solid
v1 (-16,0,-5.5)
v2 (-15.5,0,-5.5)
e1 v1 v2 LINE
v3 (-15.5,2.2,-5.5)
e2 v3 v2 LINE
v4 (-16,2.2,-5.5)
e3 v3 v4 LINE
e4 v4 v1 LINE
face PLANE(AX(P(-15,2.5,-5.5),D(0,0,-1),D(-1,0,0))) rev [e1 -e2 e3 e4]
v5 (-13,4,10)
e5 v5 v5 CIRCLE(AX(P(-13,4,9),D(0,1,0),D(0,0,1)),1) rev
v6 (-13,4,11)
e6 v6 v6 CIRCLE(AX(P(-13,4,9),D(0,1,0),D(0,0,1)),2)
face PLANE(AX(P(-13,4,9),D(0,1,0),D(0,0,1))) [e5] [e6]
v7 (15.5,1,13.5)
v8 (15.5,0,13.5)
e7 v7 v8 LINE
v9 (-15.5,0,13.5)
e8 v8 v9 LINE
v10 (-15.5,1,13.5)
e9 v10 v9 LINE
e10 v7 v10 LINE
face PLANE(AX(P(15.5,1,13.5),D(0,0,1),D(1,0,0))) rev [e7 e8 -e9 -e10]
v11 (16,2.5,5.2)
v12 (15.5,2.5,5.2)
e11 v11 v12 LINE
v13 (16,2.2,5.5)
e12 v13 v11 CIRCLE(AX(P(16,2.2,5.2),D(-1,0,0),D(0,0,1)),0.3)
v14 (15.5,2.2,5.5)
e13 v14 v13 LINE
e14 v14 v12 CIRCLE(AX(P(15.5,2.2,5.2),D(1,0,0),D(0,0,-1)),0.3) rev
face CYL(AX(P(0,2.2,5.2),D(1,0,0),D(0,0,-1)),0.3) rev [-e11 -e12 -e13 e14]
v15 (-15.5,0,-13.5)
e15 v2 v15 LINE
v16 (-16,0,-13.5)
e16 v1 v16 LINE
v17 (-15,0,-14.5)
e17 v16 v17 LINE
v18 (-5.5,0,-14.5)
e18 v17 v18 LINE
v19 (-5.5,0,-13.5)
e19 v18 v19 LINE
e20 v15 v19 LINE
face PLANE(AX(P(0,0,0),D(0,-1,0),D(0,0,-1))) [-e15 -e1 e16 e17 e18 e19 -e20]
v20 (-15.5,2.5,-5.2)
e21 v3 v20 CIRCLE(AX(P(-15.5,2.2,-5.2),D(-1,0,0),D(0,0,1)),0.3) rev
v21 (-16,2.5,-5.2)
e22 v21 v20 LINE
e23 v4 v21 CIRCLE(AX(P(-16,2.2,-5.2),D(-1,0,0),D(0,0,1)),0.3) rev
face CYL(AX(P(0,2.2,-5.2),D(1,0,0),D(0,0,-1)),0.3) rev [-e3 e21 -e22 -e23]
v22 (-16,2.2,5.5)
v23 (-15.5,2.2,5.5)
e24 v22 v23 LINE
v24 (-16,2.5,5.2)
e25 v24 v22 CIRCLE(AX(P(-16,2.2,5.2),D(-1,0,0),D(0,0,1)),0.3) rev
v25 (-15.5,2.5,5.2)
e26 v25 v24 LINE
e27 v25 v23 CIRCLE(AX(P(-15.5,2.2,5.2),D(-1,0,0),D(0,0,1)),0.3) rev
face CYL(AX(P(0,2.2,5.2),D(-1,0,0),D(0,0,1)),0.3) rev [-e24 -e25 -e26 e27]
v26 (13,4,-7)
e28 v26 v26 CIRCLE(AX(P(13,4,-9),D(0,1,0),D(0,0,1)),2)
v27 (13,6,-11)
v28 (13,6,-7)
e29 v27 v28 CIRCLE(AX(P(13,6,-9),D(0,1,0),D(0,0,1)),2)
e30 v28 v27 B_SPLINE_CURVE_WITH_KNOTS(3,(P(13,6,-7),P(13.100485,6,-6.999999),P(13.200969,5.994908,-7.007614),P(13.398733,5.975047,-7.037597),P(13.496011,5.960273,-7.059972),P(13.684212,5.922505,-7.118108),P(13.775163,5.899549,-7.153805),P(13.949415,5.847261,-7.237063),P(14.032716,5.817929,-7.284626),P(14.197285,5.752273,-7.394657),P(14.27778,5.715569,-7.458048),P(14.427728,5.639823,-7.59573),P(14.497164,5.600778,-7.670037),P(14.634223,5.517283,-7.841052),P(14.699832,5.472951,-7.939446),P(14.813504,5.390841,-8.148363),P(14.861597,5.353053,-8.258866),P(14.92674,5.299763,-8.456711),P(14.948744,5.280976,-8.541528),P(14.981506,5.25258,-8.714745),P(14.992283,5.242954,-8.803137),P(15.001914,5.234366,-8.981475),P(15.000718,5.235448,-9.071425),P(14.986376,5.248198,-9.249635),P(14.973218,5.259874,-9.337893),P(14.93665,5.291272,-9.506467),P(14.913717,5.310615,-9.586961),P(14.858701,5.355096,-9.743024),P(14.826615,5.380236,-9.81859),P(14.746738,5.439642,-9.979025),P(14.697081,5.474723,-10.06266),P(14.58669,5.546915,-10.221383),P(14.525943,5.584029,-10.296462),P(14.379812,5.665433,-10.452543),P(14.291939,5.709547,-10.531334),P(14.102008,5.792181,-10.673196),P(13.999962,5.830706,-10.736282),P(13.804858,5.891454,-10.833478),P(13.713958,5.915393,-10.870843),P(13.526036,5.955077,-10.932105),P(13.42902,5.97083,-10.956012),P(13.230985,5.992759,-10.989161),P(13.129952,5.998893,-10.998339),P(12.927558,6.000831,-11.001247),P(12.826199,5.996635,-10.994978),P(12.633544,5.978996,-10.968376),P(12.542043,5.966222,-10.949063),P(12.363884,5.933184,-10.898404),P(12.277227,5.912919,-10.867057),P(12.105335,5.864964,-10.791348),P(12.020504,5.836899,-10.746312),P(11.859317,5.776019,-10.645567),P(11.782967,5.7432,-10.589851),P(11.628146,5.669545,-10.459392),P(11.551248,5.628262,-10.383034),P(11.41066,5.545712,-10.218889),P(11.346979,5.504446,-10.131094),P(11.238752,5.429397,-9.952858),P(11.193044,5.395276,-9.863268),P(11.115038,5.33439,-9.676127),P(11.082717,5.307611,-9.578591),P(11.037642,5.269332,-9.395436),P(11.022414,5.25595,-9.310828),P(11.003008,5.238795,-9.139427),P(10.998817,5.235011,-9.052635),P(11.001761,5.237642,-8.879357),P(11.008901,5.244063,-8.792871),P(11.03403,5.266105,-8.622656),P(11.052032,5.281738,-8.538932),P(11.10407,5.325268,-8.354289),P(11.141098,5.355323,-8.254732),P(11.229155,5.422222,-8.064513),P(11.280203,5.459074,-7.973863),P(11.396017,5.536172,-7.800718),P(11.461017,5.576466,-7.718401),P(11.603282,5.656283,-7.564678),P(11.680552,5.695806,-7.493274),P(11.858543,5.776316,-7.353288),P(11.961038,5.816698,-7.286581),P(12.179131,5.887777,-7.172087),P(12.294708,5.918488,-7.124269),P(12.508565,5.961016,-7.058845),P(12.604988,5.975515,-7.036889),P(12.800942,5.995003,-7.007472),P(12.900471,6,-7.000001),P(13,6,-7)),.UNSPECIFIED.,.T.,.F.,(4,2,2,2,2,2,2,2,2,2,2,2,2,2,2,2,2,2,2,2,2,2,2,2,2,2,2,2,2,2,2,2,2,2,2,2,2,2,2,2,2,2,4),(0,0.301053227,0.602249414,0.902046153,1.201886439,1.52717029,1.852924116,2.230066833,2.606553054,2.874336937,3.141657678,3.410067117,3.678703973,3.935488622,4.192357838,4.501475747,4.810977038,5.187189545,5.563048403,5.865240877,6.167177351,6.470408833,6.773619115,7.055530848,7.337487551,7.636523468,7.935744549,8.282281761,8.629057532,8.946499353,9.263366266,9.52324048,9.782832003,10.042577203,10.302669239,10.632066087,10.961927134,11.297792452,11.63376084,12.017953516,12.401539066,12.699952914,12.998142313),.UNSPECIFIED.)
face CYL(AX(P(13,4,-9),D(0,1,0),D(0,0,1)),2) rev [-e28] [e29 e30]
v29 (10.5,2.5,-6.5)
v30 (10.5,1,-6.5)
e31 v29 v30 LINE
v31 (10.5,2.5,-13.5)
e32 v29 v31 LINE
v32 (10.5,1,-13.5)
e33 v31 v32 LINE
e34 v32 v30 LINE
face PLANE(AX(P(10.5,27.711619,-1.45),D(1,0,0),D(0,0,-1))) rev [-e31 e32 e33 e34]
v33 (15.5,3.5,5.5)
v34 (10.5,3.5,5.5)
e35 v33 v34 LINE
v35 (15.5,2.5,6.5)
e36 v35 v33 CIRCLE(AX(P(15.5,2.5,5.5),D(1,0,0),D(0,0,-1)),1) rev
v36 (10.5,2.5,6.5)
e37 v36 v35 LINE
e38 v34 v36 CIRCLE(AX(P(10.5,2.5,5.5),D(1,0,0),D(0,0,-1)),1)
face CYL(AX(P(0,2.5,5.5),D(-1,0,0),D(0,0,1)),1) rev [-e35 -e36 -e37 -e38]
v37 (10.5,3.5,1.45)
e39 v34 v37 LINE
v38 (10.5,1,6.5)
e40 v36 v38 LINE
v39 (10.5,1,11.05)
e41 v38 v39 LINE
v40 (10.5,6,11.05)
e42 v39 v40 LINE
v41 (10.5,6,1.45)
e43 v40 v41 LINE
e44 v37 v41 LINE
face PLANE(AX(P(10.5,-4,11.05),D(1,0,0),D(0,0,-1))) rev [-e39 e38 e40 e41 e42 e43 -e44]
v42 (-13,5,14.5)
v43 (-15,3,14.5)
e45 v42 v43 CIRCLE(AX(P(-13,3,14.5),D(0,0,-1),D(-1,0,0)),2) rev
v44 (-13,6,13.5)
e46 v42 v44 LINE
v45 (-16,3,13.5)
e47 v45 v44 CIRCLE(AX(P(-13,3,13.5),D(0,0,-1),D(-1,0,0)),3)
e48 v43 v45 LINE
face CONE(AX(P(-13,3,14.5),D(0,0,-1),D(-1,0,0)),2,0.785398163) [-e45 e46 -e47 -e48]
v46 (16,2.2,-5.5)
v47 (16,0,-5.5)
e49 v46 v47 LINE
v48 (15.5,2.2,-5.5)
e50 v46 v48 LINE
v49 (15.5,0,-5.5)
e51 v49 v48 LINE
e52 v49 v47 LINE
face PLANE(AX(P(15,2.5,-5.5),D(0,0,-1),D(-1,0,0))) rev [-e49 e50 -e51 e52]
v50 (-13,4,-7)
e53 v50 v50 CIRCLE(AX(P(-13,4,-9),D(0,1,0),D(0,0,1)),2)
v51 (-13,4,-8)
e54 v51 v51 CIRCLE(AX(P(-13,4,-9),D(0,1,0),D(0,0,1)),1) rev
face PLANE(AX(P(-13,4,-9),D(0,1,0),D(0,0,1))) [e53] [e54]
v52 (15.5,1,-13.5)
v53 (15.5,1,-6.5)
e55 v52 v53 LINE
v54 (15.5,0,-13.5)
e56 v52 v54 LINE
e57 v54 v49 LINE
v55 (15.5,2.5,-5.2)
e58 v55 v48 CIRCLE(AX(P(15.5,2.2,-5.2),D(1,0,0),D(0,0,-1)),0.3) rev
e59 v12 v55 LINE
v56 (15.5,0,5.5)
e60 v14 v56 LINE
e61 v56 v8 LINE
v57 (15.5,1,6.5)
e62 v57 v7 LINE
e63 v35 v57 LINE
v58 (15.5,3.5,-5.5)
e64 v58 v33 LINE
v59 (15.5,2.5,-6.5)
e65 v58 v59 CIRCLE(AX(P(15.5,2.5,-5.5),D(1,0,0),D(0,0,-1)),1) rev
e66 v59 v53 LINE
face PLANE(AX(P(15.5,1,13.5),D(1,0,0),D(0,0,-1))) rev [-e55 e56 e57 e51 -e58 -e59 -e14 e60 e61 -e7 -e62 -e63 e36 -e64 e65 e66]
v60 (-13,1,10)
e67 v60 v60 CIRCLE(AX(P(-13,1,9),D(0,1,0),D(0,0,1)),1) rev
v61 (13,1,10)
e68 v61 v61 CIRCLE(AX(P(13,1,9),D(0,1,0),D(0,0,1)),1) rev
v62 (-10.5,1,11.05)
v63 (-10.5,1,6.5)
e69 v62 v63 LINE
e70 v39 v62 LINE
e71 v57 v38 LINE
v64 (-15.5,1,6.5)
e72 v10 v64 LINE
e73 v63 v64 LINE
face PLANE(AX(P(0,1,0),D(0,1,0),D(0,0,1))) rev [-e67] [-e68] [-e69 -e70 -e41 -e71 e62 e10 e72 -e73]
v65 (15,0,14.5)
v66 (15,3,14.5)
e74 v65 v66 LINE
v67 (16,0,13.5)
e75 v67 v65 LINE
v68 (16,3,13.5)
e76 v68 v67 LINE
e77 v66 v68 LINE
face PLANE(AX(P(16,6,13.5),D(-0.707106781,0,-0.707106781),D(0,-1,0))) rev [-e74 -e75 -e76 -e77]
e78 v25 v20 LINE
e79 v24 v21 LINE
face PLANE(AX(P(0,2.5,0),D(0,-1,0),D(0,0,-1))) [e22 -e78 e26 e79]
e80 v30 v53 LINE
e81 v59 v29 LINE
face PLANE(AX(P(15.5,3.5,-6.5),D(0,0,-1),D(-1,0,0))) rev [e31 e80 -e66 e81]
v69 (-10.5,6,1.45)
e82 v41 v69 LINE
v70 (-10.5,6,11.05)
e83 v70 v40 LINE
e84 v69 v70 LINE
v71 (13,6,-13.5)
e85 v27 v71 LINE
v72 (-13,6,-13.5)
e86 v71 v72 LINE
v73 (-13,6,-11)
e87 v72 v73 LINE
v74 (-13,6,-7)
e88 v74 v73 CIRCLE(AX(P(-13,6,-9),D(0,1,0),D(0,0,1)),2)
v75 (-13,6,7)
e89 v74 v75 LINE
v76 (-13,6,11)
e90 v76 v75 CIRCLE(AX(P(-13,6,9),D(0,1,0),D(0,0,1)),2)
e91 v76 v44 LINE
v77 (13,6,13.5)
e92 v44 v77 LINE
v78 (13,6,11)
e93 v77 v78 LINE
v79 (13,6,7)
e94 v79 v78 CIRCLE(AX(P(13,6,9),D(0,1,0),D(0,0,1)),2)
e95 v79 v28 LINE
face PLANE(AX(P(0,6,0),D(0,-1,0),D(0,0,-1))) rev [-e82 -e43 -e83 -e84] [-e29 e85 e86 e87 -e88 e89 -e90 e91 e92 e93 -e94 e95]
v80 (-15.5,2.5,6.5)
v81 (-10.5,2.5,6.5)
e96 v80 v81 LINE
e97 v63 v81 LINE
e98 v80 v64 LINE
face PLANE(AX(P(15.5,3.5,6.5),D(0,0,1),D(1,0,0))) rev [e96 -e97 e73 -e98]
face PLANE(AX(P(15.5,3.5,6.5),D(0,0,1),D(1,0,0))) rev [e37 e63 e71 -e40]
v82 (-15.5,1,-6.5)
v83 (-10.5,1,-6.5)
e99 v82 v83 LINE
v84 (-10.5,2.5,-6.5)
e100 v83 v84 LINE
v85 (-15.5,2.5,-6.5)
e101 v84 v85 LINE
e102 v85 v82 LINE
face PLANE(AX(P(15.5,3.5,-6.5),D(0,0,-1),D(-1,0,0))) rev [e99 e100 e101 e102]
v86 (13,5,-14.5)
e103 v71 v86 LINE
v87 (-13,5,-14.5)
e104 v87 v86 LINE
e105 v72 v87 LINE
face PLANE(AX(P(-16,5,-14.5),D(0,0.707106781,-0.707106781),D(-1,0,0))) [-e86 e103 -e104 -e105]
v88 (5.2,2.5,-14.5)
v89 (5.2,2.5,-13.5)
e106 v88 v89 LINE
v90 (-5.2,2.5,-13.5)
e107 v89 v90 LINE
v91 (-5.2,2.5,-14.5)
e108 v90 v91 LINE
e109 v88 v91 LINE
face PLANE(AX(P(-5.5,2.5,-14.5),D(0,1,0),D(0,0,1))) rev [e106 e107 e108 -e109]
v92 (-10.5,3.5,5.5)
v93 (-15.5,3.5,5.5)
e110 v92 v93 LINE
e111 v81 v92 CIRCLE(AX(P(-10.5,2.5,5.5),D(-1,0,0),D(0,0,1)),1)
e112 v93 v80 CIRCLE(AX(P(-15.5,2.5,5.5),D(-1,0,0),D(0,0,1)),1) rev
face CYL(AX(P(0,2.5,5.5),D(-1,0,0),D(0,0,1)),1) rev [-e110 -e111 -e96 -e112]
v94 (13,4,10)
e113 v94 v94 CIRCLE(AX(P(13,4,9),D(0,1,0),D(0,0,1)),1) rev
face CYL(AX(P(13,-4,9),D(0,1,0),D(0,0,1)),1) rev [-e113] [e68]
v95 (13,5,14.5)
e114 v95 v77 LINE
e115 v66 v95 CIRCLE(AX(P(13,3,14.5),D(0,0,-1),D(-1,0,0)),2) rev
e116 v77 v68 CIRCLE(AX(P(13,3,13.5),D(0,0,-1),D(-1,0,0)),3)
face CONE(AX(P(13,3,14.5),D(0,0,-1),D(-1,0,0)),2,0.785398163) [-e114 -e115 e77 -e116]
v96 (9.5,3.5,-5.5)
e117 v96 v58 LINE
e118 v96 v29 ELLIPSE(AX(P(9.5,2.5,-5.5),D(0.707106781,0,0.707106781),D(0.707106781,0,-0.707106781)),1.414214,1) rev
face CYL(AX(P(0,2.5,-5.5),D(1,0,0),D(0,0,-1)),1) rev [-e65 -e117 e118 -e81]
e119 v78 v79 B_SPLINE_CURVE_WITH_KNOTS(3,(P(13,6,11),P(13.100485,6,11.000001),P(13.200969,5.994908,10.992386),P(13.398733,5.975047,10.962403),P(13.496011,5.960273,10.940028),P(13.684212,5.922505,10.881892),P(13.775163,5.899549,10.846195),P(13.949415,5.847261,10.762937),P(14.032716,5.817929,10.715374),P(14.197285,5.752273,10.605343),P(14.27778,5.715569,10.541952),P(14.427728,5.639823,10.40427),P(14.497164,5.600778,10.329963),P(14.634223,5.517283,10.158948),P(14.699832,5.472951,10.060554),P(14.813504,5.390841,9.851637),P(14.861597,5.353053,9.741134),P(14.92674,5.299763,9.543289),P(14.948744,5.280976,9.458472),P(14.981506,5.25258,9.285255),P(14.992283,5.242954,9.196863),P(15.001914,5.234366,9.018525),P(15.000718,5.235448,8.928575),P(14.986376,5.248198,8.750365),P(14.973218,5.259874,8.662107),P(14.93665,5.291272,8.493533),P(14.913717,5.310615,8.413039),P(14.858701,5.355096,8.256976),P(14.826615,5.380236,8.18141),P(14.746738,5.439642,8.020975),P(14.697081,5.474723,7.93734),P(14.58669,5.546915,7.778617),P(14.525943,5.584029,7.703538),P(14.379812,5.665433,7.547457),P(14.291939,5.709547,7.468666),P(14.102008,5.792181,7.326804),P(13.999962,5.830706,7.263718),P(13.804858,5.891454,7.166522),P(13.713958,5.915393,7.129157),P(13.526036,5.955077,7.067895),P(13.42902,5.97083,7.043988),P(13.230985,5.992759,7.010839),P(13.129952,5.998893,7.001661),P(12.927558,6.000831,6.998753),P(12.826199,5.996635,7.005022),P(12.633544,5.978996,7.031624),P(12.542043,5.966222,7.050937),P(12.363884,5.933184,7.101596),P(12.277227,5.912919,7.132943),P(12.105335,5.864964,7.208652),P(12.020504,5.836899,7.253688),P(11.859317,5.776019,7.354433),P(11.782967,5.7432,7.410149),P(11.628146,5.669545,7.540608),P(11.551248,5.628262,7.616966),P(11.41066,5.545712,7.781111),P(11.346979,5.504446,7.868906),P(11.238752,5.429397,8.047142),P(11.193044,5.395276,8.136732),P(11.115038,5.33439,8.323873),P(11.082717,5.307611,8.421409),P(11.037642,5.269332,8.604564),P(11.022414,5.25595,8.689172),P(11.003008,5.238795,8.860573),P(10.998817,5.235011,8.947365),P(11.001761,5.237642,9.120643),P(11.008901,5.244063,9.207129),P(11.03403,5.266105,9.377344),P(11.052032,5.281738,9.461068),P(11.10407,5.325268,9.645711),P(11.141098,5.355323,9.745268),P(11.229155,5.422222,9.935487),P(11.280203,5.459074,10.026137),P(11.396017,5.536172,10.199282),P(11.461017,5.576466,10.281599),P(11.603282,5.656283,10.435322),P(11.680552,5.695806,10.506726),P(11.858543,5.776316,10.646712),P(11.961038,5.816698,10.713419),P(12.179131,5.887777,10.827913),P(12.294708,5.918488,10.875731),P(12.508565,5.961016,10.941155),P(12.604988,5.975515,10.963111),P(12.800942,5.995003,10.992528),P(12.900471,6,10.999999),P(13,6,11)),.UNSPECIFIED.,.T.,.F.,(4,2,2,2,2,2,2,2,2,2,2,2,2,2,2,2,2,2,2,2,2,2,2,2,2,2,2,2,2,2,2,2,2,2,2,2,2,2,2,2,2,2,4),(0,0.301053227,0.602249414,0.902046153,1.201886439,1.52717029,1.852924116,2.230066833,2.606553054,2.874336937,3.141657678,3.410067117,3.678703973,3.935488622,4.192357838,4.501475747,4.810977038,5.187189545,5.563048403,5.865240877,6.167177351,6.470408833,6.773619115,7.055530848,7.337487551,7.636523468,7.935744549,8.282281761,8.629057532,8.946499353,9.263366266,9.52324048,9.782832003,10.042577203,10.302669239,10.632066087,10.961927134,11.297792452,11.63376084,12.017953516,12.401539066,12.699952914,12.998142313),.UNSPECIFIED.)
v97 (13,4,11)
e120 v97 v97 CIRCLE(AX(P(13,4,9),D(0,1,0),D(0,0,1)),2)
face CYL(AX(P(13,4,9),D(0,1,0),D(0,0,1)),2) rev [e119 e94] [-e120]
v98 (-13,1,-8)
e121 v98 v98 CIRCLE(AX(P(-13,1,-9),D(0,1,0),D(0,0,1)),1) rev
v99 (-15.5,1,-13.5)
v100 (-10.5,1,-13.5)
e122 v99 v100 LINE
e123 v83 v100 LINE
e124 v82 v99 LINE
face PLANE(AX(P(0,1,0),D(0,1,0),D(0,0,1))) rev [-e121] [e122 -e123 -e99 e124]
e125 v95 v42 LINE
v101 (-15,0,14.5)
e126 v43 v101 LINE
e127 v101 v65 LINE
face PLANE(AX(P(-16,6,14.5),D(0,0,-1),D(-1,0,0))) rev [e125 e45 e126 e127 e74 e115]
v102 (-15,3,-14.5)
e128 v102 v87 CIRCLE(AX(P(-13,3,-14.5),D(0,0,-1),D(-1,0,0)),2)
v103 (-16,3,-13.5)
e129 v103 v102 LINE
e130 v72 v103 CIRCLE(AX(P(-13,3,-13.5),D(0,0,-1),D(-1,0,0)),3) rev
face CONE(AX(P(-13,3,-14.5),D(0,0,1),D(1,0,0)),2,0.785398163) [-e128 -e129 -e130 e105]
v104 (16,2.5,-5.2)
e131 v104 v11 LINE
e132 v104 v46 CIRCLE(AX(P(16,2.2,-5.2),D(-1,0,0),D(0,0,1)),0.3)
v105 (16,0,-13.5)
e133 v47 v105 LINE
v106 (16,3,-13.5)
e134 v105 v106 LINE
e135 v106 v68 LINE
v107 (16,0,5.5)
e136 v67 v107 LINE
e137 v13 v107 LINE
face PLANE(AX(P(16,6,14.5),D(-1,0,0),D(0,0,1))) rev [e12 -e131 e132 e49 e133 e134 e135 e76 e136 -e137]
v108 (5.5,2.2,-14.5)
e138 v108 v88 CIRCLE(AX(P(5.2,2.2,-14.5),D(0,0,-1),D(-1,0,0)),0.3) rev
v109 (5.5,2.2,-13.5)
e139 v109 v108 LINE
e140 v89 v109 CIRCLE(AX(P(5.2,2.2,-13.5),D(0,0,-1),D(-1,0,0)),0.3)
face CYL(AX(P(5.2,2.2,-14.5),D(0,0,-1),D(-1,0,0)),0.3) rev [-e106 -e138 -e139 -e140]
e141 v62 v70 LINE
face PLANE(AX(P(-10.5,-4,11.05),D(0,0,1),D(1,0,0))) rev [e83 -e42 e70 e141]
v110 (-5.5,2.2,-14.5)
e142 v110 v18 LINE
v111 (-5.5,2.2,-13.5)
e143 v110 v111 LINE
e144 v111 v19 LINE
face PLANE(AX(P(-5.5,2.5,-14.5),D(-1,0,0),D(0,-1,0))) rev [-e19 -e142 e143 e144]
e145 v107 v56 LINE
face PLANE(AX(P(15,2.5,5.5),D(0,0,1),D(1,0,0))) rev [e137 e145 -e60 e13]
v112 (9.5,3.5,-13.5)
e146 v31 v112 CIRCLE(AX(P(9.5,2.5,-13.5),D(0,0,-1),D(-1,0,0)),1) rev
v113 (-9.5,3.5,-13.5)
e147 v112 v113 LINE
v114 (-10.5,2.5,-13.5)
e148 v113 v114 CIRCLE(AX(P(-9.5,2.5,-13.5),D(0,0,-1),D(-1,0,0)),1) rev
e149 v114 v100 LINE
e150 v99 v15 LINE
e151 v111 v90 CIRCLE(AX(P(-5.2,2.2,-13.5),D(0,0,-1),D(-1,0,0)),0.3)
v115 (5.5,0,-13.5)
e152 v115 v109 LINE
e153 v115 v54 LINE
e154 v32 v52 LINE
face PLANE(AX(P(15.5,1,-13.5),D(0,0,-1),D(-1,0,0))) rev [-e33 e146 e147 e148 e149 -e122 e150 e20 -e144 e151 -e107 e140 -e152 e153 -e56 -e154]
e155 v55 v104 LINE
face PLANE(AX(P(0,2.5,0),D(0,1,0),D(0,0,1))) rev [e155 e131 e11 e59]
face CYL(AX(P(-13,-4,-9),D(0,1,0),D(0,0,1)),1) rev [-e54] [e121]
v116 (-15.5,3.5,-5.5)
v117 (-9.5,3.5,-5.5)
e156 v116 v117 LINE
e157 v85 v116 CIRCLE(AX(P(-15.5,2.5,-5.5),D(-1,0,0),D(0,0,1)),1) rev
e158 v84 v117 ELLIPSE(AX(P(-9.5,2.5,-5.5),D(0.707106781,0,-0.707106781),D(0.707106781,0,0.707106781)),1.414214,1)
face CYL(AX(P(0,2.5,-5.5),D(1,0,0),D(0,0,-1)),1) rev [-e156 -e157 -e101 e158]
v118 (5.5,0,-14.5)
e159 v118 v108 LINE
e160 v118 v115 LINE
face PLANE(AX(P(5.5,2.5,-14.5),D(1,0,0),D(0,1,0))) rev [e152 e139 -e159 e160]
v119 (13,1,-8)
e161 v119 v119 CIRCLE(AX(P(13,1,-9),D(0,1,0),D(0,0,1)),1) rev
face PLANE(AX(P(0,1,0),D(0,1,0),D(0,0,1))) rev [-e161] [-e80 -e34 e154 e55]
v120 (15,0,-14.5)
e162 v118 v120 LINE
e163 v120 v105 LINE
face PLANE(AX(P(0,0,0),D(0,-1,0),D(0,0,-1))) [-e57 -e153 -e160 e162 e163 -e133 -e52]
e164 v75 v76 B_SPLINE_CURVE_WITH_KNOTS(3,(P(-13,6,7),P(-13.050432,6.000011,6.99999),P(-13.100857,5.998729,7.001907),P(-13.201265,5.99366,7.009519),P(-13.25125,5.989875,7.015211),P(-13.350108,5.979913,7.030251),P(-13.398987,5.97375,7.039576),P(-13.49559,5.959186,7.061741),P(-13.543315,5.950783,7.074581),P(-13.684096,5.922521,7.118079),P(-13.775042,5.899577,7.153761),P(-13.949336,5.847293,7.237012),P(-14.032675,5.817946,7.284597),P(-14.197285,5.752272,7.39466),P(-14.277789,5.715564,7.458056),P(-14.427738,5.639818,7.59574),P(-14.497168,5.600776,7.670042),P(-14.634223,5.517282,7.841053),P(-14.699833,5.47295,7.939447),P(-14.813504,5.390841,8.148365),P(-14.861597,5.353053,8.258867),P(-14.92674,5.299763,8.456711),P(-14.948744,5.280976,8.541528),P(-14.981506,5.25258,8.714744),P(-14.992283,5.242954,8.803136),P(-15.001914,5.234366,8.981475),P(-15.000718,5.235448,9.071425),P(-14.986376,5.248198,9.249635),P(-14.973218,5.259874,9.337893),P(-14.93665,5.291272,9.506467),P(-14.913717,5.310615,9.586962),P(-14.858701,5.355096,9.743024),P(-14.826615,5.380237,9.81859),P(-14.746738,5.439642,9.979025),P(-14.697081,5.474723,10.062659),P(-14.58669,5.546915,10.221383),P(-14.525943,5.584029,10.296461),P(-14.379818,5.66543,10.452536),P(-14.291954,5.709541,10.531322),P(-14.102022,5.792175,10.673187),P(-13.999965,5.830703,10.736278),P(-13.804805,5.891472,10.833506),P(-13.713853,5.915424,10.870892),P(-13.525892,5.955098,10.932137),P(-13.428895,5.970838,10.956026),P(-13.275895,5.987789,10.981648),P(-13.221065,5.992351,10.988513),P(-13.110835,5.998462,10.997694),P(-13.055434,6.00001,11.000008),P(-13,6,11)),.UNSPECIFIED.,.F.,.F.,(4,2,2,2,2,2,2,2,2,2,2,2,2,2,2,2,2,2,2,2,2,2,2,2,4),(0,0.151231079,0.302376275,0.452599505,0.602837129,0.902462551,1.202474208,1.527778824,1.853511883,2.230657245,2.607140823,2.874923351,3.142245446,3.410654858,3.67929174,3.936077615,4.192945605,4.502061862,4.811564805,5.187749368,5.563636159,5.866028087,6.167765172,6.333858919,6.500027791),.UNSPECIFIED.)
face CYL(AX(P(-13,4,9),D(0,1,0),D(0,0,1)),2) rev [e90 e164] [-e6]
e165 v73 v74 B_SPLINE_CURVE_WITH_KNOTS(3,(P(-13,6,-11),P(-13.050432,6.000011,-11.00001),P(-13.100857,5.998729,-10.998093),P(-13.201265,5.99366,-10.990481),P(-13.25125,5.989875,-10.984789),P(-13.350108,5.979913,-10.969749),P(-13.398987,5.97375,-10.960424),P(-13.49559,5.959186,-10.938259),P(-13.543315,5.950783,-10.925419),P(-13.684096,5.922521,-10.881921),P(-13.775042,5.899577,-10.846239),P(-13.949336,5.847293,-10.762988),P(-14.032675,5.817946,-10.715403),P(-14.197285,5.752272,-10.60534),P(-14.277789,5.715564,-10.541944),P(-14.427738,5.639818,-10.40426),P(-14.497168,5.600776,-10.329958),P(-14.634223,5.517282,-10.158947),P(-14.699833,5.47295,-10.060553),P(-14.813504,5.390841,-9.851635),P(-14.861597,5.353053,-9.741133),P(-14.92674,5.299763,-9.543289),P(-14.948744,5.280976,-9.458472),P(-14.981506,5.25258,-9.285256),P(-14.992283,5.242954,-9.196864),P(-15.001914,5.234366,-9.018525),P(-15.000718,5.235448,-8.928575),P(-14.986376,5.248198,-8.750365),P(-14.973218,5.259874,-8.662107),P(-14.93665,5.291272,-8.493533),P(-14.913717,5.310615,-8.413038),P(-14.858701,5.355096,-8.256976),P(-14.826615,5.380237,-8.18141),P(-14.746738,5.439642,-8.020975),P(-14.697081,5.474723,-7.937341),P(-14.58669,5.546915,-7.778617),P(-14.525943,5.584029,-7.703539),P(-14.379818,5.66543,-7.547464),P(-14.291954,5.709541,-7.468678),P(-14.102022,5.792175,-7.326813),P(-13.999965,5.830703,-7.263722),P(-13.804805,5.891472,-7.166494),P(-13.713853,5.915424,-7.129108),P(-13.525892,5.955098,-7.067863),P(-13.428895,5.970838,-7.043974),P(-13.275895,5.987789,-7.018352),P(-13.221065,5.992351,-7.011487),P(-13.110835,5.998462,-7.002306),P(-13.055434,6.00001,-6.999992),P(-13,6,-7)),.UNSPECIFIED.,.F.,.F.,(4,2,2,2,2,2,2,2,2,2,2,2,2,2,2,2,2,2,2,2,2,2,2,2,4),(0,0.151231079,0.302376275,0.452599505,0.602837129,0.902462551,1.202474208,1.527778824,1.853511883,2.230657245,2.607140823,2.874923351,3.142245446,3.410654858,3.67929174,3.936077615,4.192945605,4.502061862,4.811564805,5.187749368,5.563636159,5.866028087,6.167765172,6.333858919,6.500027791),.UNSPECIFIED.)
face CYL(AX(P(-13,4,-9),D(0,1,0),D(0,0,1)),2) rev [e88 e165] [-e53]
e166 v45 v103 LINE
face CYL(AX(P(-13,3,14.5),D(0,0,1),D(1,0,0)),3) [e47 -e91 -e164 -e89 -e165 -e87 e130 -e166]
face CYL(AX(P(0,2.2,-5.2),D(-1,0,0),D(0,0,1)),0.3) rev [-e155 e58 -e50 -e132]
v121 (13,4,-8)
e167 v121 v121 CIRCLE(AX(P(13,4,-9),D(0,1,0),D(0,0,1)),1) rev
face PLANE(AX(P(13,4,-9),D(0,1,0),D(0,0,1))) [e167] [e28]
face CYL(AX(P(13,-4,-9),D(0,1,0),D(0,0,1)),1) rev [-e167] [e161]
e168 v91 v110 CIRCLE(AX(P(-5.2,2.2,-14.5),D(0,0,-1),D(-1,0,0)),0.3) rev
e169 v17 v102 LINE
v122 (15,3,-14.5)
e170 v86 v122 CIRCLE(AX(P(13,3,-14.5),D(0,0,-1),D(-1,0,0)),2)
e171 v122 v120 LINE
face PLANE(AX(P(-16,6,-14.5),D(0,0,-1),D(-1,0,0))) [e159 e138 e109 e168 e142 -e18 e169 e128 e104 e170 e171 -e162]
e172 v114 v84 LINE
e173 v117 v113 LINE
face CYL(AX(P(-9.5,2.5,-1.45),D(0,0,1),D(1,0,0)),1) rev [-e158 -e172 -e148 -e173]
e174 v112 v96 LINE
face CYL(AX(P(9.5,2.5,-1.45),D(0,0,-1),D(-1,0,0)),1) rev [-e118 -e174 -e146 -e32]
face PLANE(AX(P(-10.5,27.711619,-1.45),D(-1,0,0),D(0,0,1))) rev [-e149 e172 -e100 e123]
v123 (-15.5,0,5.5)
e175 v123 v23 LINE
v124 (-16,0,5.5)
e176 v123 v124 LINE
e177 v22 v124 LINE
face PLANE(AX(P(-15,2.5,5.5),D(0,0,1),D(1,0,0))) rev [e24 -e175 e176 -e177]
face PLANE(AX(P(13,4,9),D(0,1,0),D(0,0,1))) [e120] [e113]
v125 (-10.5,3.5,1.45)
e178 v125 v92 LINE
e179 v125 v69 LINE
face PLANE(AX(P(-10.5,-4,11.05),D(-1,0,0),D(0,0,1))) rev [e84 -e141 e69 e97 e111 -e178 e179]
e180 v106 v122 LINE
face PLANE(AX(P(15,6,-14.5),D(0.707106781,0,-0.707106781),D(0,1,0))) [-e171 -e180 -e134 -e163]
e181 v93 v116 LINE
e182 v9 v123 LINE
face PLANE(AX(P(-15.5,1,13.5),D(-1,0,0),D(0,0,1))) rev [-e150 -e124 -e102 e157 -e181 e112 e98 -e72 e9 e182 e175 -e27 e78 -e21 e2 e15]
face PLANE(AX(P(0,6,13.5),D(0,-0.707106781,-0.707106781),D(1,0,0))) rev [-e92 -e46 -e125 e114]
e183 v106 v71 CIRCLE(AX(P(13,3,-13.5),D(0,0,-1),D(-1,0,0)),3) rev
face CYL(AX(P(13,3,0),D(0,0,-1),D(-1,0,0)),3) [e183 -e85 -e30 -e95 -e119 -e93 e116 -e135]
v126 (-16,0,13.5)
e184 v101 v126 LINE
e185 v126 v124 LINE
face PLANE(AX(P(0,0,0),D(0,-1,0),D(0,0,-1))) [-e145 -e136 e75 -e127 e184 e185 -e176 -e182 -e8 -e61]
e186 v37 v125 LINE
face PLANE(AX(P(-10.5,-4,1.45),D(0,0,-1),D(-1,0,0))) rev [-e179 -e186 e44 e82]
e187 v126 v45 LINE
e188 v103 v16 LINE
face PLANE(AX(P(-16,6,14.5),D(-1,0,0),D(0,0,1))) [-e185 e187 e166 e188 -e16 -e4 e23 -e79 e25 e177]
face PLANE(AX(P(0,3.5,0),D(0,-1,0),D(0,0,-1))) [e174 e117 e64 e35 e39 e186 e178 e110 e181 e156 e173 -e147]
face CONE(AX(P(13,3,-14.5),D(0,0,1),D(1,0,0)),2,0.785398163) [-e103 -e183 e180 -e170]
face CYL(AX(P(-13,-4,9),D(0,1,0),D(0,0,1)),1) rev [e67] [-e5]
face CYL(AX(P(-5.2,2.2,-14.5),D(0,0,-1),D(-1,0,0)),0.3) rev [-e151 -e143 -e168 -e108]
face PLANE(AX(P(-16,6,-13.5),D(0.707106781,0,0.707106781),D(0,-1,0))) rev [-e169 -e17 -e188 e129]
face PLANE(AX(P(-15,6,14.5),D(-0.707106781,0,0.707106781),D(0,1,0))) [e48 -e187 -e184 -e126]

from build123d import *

# Parameters (mm, degrees)
SKETCH1_W           = 32
SKETCH1_H           = 29
BOSS_EXTRUDE1_DEPTH = 6
SKETCH2_R           = 1
CUT_EXTRUDE1_DEPTH  = 10
SKETCH3_W           = 21
SKETCH3_H           = 9.6
CUT_EXTRUDE2_DEPTH  = 10
SKETCH4_W           = 31
SKETCH4_H           = 27
CUT_EXTRUDE3_DEPTH  = 1
FILLET2_R           = 3
SKETCH5_R           = 2
CUT_EXTRUDE4_DEPTH  = 2
CHAMFER2_SIZE       = 1
SKETCH6_W           = 1
SKETCH6_H           = 11
CUT_EXTRUDE5_DEPTH  = 2.5
FILLET3_R           = 0.3
SKETCH7_W           = 31
SKETCH7_H           = 13
CUT_EXTRUDE6_DEPTH  = 2.5
FILLET4_R           = 1
SKETCH_1_W          = 21
SKETCH_1_H          = 12.05
CUT_EXTRUDE_1_DEPTH = 2.5
FILLET_1_R          = 1
SKETCH_2_W          = 11
SKETCH_2_H          = 2.5
CUT_EXTRUDE_2_DEPTH = 33.802439001
FILLET_2_R          = 0.3


with BuildPart() as part:
    # Sketch1 → Boss-Extrude1 (new body)
    with BuildSketch(Plane(origin=(0, 0, 0), x_dir=(1, 0, 0), z_dir=(0, 1, 0))):
        Rectangle(SKETCH1_W, SKETCH1_H)
    extrude(amount=BOSS_EXTRUDE1_DEPTH)

    # Sketch2 → Cut-Extrude1 (cut)
    with BuildSketch(Plane(origin=(0, 6, 0), x_dir=(1, 0, 0), z_dir=(0, 1, 0))):
        with Locations(Location((-13, 9, 0), (0, 0, 270))):
            Circle(SKETCH2_R)
        with Locations(Location((13, 9, 0), (0, 0, 270))):
            Circle(SKETCH2_R)
        with Locations(Location((13, -9, 0), (0, 0, 270))):
            Circle(SKETCH2_R)
        with Locations(Location((-13, -9, 0), (0, 0, 270))):
            Circle(SKETCH2_R)
    extrude(amount=-CUT_EXTRUDE1_DEPTH, mode=Mode.SUBTRACT)

    # Sketch3 → Cut-Extrude2 (cut)
    with BuildSketch(Plane(origin=(0, 6, 0), x_dir=(1, 0, 0), z_dir=(0, 1, 0))):
        with Locations((0, -6.25)):
            Rectangle(SKETCH3_W, SKETCH3_H)
    extrude(amount=-CUT_EXTRUDE2_DEPTH, mode=Mode.SUBTRACT)

    # Sketch4 → Cut-Extrude3 (cut)
    with BuildSketch(Plane.XZ):
        Rectangle(SKETCH4_W, SKETCH4_H)
    extrude(amount=-CUT_EXTRUDE3_DEPTH, mode=Mode.SUBTRACT)

    # Fillet2
    # the kernel refuses this fillet: 3 mm, written as the material it takes off along each edge
    with BuildSketch(Plane(origin=(16, 6, 22), x_dir=(0, -1, 0), z_dir=(0, 0, -1)), Plane(origin=(-16, 6, -22), x_dir=(0, -1, 0), z_dir=(0, 0, 1))) as fillet2_piece_1:
        with BuildLine():
            CenterArc((FILLET2_R, FILLET2_R), FILLET2_R, 180, 90)
            Line((0, FILLET2_R), (0, 0))
            Line((0, 0), (FILLET2_R, 0))
        make_face()
    extrude(amount=44, mode=Mode.SUBTRACT)

    # Sketch5 → Cut-Extrude4 (cut)
    with BuildSketch(Plane(origin=(0, 6, 0), x_dir=(1, 0, 0), z_dir=(0, 1, 0))):
        with Locations(Location((-13, 9, 0), (0, 0, 270))):
            Circle(SKETCH5_R)
        with Locations(Location((13, 9, 0), (0, 0, 270))):
            Circle(SKETCH5_R)
        with Locations(Location((13, -9, 0), (0, 0, 270))):
            Circle(SKETCH5_R)
        with Locations(Location((-13, -9, 0), (0, 0, 270))):
            Circle(SKETCH5_R)
    extrude(amount=-CUT_EXTRUDE4_DEPTH, mode=Mode.SUBTRACT)

    # Chamfer2
    chamfer2_edges = [part.edges().sort_by_distance(p)[0] for p in [
        (16, 1.5, 14.5),
        (15.121320344, 5.121320344, 14.5),
        (-15.121320344, 5.121320344, 14.5),
        (-16, 1.5, 14.5),
        (-16, 1.5, -14.5),
        (0, 6, -14.5),
        (16, 1.5, -14.5),
        (15.121320344, 5.121320344, -14.5),
        (-15.121320344, 5.121320344, -14.5),
        (0, 6, 14.5),
    ]]
    chamfer(chamfer2_edges, length=CHAMFER2_SIZE)

    # Sketch6 → Cut-Extrude5 (cut)
    with BuildSketch(Plane.XZ):
        with Locations((-15.5, 0)):
            Rectangle(SKETCH6_W, SKETCH6_H)
        with Locations((15.5, 0)):
            Rectangle(SKETCH6_W, SKETCH6_H)
    extrude(amount=-CUT_EXTRUDE5_DEPTH, mode=Mode.SUBTRACT)

    # Fillet3
    fillet3_edges = [part.edges().sort_by_distance(p)[0] for p in [
        (-15.5, 2.5, 5.5),
        (-15.5, 2.5, -5.5),
        (15.5, 2.5, -5.5),
        (15.5, 2.5, 5.5),
    ]]
    fillet(fillet3_edges, radius=FILLET3_R)

    # Sketch7 → Cut-Extrude6 (cut)
    with BuildSketch(Plane.XZ.offset(-1)):
        Rectangle(SKETCH7_W, SKETCH7_H)
    extrude(amount=-CUT_EXTRUDE6_DEPTH, mode=Mode.SUBTRACT)

    # Fillet4
    fillet4_edges = [part.edges().sort_by_distance(p)[0] for p in [
        (-13, 3.5, 6.5),
        (13, 3.5, 6.5),
        (0, 3.5, -6.5),
    ]]
    fillet(fillet4_edges, radius=FILLET4_R)

    # Эскиз1 → Вырез-Вытянуть1 (cut)
    with BuildSketch(Plane.XZ.offset(-1)):
        with Locations((0, -7.475)):
            Rectangle(SKETCH_1_W, SKETCH_1_H)
    extrude(amount=-CUT_EXTRUDE_1_DEPTH, mode=Mode.SUBTRACT)

    # Скругление1
    fillet_1_edges = [part.edges().sort_by_distance(p)[0] for p in [
        (10.5, 3.5, -9.5),
        (-10.5, 3.5, -9.5),
    ]]
    fillet(fillet_1_edges, radius=FILLET_1_R)

    # Эскиз2 → Вырез-Вытянуть2 (cut, through all)
    with BuildSketch(Plane.XY.offset(-13.5)):
        with Locations((0, 1.25)):
            Rectangle(SKETCH_2_W, SKETCH_2_H)
    extrude(amount=-CUT_EXTRUDE_2_DEPTH, mode=Mode.SUBTRACT)

    # Скругление2
    fillet_2_edges = [part.edges().sort_by_distance(p)[0] for p in [
        (5.5, 2.5, -14),
        (-5.5, 2.5, -14),
    ]]
    fillet(fillet_2_edges, radius=FILLET_2_R)


solid = part.part
